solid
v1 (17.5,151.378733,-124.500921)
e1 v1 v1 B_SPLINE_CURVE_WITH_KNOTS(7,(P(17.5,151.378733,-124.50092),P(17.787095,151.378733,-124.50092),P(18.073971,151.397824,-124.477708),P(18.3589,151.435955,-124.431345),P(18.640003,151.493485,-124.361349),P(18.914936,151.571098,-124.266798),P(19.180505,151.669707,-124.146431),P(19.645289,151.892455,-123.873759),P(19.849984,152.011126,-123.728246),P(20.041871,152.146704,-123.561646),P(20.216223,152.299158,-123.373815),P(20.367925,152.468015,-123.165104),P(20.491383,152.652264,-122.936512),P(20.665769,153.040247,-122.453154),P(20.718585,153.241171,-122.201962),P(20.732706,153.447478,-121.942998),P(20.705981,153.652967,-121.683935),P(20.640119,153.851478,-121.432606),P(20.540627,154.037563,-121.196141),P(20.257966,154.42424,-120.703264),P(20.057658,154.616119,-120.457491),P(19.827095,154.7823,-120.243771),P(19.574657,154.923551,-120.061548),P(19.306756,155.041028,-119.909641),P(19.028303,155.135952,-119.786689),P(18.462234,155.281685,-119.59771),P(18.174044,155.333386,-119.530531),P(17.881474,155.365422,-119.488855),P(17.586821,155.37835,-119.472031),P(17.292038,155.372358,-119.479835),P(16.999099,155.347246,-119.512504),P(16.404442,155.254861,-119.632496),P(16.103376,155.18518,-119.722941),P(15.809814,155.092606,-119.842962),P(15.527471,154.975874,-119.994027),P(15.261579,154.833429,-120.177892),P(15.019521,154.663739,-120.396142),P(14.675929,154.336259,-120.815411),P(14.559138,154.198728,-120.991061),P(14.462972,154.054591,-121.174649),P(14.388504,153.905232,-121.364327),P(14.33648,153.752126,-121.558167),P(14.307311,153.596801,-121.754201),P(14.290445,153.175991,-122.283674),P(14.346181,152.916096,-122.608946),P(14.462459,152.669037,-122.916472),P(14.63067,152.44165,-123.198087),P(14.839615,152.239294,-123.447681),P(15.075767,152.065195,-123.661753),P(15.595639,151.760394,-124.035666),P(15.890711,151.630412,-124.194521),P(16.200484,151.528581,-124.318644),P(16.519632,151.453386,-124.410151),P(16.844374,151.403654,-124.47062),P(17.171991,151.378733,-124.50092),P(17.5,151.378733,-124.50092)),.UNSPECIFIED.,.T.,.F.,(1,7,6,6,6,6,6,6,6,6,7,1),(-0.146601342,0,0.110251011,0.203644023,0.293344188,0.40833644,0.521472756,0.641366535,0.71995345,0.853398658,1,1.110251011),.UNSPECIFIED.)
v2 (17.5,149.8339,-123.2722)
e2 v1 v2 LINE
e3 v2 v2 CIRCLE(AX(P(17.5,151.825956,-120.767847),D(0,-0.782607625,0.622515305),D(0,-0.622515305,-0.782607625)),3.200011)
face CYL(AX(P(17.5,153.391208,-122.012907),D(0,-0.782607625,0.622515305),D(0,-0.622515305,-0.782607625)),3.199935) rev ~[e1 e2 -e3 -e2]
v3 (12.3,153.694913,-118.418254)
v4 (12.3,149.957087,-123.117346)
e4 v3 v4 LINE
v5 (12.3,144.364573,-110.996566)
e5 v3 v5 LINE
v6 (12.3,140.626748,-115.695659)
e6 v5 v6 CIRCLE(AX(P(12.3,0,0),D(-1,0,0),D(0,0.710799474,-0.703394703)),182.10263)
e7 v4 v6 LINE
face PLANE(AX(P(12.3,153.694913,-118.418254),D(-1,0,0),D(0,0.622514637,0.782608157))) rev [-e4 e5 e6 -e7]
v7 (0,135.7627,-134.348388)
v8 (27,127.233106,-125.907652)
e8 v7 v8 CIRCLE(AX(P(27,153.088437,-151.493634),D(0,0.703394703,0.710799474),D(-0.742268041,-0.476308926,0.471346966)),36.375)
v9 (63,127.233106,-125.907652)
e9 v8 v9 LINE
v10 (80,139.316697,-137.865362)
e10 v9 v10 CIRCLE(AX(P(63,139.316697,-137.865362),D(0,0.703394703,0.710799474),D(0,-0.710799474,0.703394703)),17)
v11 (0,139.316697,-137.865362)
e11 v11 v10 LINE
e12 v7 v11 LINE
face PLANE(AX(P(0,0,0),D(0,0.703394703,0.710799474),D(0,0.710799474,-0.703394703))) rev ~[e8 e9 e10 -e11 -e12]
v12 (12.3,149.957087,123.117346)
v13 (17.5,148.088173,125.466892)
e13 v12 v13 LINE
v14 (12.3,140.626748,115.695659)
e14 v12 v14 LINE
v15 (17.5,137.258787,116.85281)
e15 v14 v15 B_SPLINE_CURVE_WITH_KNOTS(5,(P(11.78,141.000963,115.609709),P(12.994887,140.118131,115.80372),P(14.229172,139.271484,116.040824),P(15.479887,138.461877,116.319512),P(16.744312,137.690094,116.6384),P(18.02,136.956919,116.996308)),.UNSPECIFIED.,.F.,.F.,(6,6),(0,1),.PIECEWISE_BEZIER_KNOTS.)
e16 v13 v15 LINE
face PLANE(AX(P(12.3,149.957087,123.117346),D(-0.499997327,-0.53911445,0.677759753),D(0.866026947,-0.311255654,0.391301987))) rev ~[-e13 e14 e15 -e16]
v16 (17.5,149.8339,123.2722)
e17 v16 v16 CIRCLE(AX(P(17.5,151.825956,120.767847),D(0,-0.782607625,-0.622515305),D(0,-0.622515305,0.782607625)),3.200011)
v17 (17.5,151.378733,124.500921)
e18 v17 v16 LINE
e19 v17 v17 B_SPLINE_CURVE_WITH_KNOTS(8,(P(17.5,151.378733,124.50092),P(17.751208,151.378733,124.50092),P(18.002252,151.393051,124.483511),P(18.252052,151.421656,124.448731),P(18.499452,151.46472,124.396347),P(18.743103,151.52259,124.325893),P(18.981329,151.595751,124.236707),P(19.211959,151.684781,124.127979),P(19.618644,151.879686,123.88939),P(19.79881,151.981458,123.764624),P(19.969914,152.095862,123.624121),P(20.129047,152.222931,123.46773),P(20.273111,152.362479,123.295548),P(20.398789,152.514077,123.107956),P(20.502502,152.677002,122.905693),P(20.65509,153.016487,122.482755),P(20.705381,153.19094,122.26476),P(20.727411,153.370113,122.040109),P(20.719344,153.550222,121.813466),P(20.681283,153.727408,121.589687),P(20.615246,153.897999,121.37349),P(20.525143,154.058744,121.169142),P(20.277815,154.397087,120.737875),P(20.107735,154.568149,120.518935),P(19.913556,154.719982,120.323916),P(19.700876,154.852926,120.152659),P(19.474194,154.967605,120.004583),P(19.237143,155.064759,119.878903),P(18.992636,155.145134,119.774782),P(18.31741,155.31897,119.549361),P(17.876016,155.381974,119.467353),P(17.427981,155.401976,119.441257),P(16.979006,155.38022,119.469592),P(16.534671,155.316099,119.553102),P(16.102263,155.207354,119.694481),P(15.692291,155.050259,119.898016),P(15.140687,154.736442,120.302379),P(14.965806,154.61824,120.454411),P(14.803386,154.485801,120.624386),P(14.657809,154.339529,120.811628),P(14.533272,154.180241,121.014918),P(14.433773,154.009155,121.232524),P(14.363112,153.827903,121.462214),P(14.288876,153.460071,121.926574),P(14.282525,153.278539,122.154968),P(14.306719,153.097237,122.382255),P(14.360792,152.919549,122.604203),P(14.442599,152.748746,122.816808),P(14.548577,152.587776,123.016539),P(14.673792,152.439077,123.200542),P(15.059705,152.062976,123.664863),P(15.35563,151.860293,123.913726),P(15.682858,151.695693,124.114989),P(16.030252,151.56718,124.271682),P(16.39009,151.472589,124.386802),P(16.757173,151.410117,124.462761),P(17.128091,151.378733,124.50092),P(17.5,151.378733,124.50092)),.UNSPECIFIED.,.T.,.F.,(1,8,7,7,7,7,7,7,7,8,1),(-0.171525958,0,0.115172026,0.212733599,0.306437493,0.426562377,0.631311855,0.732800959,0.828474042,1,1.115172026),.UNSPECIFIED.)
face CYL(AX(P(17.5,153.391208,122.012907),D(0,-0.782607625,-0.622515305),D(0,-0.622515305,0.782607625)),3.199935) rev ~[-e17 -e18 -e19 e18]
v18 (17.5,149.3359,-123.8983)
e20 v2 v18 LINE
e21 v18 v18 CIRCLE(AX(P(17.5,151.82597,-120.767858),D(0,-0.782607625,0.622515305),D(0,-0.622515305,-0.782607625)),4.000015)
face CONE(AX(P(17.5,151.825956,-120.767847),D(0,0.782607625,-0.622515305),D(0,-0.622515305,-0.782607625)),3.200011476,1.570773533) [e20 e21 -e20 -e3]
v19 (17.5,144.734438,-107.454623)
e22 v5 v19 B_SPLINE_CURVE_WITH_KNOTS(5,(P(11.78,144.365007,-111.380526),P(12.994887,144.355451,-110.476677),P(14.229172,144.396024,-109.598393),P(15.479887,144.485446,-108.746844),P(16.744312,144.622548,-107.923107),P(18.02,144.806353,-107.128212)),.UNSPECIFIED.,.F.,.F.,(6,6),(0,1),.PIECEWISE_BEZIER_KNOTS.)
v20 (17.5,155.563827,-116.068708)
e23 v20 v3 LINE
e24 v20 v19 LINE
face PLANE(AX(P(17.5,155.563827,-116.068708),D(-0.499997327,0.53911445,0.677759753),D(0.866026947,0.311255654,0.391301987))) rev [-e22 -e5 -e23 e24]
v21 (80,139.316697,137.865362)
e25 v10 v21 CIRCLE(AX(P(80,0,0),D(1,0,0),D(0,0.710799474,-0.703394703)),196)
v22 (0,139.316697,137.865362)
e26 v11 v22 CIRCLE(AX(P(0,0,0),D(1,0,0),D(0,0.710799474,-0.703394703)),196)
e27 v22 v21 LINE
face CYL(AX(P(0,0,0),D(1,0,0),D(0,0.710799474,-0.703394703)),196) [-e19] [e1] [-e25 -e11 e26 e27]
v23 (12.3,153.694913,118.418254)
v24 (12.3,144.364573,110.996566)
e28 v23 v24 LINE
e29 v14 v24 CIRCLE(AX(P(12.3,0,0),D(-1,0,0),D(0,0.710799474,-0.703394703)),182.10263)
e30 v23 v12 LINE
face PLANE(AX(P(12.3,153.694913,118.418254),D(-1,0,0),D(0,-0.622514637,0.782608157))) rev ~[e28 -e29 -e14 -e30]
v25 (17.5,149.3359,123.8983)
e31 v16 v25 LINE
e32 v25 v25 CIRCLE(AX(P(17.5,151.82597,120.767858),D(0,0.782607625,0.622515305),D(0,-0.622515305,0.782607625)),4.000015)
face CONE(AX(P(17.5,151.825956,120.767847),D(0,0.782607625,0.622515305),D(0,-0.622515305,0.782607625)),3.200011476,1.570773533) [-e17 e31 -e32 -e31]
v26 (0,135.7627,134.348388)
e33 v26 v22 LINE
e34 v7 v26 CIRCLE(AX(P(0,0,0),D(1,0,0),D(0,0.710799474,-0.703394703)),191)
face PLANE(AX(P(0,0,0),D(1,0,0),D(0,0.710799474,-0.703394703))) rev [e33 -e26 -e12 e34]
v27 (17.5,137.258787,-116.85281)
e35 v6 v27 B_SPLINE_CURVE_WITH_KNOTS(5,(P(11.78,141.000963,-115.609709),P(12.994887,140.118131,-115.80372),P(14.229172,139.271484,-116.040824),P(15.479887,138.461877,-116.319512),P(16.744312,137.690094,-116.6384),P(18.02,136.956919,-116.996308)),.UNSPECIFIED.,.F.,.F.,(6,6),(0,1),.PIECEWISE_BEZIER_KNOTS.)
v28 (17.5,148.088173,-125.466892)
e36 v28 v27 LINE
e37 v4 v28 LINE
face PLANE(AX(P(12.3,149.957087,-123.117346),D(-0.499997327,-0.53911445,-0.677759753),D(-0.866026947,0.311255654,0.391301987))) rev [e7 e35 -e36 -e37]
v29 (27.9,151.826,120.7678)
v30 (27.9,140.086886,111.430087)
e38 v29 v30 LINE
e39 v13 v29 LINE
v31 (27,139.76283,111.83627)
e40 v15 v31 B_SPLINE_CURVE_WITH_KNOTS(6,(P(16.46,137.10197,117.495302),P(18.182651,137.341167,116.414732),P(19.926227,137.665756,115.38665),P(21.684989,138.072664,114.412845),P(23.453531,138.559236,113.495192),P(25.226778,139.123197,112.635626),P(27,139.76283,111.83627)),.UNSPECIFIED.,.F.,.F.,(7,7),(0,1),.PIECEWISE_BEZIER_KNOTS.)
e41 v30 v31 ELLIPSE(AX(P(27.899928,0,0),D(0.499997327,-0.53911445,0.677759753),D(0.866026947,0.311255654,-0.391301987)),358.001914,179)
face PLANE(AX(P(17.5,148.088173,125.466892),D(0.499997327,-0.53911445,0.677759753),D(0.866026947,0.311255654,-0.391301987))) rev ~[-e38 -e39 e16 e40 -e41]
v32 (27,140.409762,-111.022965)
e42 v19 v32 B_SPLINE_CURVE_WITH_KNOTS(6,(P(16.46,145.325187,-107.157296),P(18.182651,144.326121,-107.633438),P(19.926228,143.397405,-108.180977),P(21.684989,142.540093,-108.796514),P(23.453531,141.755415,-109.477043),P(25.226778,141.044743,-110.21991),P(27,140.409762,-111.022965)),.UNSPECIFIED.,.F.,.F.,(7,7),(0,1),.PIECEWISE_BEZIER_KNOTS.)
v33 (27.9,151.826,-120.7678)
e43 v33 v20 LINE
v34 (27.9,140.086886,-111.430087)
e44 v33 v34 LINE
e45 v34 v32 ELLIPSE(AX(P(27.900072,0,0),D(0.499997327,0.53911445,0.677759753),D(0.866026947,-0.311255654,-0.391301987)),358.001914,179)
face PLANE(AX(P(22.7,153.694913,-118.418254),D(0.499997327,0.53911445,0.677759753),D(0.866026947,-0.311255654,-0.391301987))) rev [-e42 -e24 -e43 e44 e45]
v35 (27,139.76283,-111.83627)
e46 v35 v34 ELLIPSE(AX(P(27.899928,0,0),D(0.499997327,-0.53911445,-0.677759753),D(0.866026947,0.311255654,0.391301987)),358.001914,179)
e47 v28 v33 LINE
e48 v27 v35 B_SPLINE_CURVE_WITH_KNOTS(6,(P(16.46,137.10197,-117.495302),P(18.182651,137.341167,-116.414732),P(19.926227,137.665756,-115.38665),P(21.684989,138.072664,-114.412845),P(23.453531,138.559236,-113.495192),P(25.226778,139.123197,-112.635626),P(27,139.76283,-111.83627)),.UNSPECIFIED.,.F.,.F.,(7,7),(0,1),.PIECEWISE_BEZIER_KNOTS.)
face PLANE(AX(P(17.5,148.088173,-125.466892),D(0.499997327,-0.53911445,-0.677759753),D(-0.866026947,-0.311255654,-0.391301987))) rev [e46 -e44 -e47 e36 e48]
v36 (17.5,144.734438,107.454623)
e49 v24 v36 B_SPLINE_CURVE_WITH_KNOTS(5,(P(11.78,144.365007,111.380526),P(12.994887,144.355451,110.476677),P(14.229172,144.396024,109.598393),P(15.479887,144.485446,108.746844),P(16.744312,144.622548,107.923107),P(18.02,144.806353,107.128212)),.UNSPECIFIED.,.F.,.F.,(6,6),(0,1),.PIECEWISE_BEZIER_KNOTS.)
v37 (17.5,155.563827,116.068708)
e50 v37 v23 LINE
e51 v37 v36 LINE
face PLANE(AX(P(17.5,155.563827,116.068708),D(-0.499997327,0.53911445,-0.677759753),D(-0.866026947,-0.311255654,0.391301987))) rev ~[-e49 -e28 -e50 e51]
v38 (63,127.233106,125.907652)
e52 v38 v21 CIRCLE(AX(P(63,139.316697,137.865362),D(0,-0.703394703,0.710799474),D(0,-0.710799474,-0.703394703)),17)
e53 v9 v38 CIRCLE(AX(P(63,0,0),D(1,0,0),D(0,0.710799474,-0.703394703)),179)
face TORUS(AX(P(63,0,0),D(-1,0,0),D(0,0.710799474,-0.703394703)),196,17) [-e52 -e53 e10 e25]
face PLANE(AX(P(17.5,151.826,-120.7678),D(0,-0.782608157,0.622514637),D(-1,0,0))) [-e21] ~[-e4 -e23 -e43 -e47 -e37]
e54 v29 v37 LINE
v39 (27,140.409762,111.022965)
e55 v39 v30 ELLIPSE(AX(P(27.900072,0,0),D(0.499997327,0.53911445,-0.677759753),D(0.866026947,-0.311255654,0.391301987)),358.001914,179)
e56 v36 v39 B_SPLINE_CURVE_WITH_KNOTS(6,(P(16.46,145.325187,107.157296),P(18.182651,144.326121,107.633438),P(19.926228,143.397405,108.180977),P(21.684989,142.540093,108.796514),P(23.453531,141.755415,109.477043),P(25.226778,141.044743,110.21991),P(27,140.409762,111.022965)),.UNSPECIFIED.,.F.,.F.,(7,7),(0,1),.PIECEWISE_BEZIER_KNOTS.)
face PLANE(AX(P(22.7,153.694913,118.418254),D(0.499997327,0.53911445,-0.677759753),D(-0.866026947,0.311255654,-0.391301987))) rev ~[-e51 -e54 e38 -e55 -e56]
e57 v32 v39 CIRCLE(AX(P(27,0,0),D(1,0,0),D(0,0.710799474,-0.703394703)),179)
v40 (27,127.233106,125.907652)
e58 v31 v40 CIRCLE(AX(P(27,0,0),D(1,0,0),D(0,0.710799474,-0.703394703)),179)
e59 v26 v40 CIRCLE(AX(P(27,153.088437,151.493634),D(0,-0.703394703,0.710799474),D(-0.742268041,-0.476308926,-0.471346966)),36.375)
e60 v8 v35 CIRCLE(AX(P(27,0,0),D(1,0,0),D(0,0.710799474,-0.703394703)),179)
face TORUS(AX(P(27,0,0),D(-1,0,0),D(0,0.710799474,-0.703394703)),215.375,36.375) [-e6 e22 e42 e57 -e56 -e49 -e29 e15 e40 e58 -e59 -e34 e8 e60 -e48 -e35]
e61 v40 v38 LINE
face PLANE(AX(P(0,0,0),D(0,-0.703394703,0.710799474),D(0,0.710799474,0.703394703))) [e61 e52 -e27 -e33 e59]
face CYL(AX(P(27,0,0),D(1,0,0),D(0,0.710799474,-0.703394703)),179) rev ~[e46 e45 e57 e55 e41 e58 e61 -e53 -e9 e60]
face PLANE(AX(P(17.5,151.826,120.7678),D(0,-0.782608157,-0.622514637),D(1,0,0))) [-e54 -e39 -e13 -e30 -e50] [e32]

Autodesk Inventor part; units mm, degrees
ref_plane "XY Plane" through (0, 0, 0) normal (0, 0, 1) x (1, 0, 0)
sketch "Skizze6" plane through (0, 0, 0) normal (0, 0, 1) x (0, 1, 0)
  line L0 (0, 181.4954) -> (0, -165.4211)
  line L1 (196, 0) -> (196, -80)
  line L2 (179, -27) -> (179, -63)
  arc A0 (191, 0) -> (179, -27) centre (215.375, -27) ccw
  arc A1 (179, -63) -> (196, -80) centre (196, -63) ccw
  line L3 (191, 0) -> (196, 0)
  line L4 (258.45, 0) -> (-43.075, 0) projected
  point P0 (0, 0)
  dimension "d29" = 80
  dimension "d30" = 392
  dimension "d31" = 358
  dimension "d32" = 5
  dimension "d35" = 27
revolve "Umdrehung1" add sketch "Skizze6" angle 89.4 mid plane about axis through (-181.4954, 0, 0) along (1, 0, 0)
ref_plane "Arbeitsebene1" through (17.5, 0, 0) normal (1, 0, 0) x (0, 1, 0)
sketch "Skizze7" plane through (17.5, 0, 0) normal (1, 0, 0) x (0, 1, 0)
  line L0 (0, 0) -> (200, 159.0872)
  line L1 (-40, 0) -> (240, 0) projected
  arc A0 (139.3167, -137.8654) -> (139.3167, 137.8654) centre (0, 0) ccw projected
  line L2 (153.3912, 122.0129) -> (151.3992, 124.5172)
  line L3 (151.3992, 124.5172) -> (149.8339, 123.2722)
  line L4 (149.8339, 123.2722) -> (149.3359, 123.8983)
  line L5 (149.3359, 123.8983) -> (137.5618, 114.5327)
  arc A1 (127.2331, -125.9077) -> (127.2331, 125.9077) centre (0, 0) ccw projected
  line L6 (137.5618, 114.5327) -> (140.0519, 111.4023)
  arc A2 (139.3167, -137.8654) -> (139.3167, 137.8654) centre (0, 0) ccw projected
  point P0 (140.0869, 111.4301)
  point P1 (151.3787, 124.501)
  point P2 (153.3912, 122.0129)
  point P3 (153.3912, 122.0129)
  dimension "d37" = 38.5
  dimension "d38" = 200
  dimension "d39" = 6.4
  dimension "d40" = 8
  dimension "d41" = 2
revolve "Umdrehung2" cut sketch "Skizze7" angle 360 about axis through (17.5, 0, 0) along (0, 0.7826082, 0.6225146) contours A1 L5 L4 L3 A0 L0 | A0 L3 L2
sketch "Skizze8" plane through (17.5, 151.826, 120.7678) normal (0, -0.7826082, -0.6225146) x (1, 0, 0)
  line L0 (-5.2, -3.0022) -> (-5.2, 3.0022)
  line L1 (-5.2, 3.0022) -> (0, 6.0044)
  line L2 (0, 6.0044) -> (5.2, 3.0022)
  line L3 (5.2, 3.0022) -> (5.2, -3.0022)
  line L4 (5.2, -3.0022) -> (0, -6.0044)
  line L5 (0, -6.0044) -> (-5.2, -3.0022)
  line L6 (0, 80.4096) -> (0, -281.6269) projected
  circle A0 centre (0, 0) radius 3.2 projected
  line L7 (5.2, 3.0022) -> (10.4, 0)
  line L8 (10.4, 0) -> (5.2, -3.0022)
  point P0 (-17.5, 0)
  point P1 (0, 0)
  dimension "d43" = 10.4
extrude "Extrusion6" cut sketch "Skizze8" along normal through all contours L0 L1 L6 A0 L5 | L6 A0 L2 L3 L4 | L3 L7 L8
mirror "Spiegeln2" about plane through (0, 0, 0) normal (0, 0, 1) of "Extrusion6", "Umdrehung2"
ref_plane "Arbeitsebene3" through (40, 196, 0) normal (0, 1, 0) x (-1, 0, 0)
properties part number "Ventilator_Flansch_Oben"
